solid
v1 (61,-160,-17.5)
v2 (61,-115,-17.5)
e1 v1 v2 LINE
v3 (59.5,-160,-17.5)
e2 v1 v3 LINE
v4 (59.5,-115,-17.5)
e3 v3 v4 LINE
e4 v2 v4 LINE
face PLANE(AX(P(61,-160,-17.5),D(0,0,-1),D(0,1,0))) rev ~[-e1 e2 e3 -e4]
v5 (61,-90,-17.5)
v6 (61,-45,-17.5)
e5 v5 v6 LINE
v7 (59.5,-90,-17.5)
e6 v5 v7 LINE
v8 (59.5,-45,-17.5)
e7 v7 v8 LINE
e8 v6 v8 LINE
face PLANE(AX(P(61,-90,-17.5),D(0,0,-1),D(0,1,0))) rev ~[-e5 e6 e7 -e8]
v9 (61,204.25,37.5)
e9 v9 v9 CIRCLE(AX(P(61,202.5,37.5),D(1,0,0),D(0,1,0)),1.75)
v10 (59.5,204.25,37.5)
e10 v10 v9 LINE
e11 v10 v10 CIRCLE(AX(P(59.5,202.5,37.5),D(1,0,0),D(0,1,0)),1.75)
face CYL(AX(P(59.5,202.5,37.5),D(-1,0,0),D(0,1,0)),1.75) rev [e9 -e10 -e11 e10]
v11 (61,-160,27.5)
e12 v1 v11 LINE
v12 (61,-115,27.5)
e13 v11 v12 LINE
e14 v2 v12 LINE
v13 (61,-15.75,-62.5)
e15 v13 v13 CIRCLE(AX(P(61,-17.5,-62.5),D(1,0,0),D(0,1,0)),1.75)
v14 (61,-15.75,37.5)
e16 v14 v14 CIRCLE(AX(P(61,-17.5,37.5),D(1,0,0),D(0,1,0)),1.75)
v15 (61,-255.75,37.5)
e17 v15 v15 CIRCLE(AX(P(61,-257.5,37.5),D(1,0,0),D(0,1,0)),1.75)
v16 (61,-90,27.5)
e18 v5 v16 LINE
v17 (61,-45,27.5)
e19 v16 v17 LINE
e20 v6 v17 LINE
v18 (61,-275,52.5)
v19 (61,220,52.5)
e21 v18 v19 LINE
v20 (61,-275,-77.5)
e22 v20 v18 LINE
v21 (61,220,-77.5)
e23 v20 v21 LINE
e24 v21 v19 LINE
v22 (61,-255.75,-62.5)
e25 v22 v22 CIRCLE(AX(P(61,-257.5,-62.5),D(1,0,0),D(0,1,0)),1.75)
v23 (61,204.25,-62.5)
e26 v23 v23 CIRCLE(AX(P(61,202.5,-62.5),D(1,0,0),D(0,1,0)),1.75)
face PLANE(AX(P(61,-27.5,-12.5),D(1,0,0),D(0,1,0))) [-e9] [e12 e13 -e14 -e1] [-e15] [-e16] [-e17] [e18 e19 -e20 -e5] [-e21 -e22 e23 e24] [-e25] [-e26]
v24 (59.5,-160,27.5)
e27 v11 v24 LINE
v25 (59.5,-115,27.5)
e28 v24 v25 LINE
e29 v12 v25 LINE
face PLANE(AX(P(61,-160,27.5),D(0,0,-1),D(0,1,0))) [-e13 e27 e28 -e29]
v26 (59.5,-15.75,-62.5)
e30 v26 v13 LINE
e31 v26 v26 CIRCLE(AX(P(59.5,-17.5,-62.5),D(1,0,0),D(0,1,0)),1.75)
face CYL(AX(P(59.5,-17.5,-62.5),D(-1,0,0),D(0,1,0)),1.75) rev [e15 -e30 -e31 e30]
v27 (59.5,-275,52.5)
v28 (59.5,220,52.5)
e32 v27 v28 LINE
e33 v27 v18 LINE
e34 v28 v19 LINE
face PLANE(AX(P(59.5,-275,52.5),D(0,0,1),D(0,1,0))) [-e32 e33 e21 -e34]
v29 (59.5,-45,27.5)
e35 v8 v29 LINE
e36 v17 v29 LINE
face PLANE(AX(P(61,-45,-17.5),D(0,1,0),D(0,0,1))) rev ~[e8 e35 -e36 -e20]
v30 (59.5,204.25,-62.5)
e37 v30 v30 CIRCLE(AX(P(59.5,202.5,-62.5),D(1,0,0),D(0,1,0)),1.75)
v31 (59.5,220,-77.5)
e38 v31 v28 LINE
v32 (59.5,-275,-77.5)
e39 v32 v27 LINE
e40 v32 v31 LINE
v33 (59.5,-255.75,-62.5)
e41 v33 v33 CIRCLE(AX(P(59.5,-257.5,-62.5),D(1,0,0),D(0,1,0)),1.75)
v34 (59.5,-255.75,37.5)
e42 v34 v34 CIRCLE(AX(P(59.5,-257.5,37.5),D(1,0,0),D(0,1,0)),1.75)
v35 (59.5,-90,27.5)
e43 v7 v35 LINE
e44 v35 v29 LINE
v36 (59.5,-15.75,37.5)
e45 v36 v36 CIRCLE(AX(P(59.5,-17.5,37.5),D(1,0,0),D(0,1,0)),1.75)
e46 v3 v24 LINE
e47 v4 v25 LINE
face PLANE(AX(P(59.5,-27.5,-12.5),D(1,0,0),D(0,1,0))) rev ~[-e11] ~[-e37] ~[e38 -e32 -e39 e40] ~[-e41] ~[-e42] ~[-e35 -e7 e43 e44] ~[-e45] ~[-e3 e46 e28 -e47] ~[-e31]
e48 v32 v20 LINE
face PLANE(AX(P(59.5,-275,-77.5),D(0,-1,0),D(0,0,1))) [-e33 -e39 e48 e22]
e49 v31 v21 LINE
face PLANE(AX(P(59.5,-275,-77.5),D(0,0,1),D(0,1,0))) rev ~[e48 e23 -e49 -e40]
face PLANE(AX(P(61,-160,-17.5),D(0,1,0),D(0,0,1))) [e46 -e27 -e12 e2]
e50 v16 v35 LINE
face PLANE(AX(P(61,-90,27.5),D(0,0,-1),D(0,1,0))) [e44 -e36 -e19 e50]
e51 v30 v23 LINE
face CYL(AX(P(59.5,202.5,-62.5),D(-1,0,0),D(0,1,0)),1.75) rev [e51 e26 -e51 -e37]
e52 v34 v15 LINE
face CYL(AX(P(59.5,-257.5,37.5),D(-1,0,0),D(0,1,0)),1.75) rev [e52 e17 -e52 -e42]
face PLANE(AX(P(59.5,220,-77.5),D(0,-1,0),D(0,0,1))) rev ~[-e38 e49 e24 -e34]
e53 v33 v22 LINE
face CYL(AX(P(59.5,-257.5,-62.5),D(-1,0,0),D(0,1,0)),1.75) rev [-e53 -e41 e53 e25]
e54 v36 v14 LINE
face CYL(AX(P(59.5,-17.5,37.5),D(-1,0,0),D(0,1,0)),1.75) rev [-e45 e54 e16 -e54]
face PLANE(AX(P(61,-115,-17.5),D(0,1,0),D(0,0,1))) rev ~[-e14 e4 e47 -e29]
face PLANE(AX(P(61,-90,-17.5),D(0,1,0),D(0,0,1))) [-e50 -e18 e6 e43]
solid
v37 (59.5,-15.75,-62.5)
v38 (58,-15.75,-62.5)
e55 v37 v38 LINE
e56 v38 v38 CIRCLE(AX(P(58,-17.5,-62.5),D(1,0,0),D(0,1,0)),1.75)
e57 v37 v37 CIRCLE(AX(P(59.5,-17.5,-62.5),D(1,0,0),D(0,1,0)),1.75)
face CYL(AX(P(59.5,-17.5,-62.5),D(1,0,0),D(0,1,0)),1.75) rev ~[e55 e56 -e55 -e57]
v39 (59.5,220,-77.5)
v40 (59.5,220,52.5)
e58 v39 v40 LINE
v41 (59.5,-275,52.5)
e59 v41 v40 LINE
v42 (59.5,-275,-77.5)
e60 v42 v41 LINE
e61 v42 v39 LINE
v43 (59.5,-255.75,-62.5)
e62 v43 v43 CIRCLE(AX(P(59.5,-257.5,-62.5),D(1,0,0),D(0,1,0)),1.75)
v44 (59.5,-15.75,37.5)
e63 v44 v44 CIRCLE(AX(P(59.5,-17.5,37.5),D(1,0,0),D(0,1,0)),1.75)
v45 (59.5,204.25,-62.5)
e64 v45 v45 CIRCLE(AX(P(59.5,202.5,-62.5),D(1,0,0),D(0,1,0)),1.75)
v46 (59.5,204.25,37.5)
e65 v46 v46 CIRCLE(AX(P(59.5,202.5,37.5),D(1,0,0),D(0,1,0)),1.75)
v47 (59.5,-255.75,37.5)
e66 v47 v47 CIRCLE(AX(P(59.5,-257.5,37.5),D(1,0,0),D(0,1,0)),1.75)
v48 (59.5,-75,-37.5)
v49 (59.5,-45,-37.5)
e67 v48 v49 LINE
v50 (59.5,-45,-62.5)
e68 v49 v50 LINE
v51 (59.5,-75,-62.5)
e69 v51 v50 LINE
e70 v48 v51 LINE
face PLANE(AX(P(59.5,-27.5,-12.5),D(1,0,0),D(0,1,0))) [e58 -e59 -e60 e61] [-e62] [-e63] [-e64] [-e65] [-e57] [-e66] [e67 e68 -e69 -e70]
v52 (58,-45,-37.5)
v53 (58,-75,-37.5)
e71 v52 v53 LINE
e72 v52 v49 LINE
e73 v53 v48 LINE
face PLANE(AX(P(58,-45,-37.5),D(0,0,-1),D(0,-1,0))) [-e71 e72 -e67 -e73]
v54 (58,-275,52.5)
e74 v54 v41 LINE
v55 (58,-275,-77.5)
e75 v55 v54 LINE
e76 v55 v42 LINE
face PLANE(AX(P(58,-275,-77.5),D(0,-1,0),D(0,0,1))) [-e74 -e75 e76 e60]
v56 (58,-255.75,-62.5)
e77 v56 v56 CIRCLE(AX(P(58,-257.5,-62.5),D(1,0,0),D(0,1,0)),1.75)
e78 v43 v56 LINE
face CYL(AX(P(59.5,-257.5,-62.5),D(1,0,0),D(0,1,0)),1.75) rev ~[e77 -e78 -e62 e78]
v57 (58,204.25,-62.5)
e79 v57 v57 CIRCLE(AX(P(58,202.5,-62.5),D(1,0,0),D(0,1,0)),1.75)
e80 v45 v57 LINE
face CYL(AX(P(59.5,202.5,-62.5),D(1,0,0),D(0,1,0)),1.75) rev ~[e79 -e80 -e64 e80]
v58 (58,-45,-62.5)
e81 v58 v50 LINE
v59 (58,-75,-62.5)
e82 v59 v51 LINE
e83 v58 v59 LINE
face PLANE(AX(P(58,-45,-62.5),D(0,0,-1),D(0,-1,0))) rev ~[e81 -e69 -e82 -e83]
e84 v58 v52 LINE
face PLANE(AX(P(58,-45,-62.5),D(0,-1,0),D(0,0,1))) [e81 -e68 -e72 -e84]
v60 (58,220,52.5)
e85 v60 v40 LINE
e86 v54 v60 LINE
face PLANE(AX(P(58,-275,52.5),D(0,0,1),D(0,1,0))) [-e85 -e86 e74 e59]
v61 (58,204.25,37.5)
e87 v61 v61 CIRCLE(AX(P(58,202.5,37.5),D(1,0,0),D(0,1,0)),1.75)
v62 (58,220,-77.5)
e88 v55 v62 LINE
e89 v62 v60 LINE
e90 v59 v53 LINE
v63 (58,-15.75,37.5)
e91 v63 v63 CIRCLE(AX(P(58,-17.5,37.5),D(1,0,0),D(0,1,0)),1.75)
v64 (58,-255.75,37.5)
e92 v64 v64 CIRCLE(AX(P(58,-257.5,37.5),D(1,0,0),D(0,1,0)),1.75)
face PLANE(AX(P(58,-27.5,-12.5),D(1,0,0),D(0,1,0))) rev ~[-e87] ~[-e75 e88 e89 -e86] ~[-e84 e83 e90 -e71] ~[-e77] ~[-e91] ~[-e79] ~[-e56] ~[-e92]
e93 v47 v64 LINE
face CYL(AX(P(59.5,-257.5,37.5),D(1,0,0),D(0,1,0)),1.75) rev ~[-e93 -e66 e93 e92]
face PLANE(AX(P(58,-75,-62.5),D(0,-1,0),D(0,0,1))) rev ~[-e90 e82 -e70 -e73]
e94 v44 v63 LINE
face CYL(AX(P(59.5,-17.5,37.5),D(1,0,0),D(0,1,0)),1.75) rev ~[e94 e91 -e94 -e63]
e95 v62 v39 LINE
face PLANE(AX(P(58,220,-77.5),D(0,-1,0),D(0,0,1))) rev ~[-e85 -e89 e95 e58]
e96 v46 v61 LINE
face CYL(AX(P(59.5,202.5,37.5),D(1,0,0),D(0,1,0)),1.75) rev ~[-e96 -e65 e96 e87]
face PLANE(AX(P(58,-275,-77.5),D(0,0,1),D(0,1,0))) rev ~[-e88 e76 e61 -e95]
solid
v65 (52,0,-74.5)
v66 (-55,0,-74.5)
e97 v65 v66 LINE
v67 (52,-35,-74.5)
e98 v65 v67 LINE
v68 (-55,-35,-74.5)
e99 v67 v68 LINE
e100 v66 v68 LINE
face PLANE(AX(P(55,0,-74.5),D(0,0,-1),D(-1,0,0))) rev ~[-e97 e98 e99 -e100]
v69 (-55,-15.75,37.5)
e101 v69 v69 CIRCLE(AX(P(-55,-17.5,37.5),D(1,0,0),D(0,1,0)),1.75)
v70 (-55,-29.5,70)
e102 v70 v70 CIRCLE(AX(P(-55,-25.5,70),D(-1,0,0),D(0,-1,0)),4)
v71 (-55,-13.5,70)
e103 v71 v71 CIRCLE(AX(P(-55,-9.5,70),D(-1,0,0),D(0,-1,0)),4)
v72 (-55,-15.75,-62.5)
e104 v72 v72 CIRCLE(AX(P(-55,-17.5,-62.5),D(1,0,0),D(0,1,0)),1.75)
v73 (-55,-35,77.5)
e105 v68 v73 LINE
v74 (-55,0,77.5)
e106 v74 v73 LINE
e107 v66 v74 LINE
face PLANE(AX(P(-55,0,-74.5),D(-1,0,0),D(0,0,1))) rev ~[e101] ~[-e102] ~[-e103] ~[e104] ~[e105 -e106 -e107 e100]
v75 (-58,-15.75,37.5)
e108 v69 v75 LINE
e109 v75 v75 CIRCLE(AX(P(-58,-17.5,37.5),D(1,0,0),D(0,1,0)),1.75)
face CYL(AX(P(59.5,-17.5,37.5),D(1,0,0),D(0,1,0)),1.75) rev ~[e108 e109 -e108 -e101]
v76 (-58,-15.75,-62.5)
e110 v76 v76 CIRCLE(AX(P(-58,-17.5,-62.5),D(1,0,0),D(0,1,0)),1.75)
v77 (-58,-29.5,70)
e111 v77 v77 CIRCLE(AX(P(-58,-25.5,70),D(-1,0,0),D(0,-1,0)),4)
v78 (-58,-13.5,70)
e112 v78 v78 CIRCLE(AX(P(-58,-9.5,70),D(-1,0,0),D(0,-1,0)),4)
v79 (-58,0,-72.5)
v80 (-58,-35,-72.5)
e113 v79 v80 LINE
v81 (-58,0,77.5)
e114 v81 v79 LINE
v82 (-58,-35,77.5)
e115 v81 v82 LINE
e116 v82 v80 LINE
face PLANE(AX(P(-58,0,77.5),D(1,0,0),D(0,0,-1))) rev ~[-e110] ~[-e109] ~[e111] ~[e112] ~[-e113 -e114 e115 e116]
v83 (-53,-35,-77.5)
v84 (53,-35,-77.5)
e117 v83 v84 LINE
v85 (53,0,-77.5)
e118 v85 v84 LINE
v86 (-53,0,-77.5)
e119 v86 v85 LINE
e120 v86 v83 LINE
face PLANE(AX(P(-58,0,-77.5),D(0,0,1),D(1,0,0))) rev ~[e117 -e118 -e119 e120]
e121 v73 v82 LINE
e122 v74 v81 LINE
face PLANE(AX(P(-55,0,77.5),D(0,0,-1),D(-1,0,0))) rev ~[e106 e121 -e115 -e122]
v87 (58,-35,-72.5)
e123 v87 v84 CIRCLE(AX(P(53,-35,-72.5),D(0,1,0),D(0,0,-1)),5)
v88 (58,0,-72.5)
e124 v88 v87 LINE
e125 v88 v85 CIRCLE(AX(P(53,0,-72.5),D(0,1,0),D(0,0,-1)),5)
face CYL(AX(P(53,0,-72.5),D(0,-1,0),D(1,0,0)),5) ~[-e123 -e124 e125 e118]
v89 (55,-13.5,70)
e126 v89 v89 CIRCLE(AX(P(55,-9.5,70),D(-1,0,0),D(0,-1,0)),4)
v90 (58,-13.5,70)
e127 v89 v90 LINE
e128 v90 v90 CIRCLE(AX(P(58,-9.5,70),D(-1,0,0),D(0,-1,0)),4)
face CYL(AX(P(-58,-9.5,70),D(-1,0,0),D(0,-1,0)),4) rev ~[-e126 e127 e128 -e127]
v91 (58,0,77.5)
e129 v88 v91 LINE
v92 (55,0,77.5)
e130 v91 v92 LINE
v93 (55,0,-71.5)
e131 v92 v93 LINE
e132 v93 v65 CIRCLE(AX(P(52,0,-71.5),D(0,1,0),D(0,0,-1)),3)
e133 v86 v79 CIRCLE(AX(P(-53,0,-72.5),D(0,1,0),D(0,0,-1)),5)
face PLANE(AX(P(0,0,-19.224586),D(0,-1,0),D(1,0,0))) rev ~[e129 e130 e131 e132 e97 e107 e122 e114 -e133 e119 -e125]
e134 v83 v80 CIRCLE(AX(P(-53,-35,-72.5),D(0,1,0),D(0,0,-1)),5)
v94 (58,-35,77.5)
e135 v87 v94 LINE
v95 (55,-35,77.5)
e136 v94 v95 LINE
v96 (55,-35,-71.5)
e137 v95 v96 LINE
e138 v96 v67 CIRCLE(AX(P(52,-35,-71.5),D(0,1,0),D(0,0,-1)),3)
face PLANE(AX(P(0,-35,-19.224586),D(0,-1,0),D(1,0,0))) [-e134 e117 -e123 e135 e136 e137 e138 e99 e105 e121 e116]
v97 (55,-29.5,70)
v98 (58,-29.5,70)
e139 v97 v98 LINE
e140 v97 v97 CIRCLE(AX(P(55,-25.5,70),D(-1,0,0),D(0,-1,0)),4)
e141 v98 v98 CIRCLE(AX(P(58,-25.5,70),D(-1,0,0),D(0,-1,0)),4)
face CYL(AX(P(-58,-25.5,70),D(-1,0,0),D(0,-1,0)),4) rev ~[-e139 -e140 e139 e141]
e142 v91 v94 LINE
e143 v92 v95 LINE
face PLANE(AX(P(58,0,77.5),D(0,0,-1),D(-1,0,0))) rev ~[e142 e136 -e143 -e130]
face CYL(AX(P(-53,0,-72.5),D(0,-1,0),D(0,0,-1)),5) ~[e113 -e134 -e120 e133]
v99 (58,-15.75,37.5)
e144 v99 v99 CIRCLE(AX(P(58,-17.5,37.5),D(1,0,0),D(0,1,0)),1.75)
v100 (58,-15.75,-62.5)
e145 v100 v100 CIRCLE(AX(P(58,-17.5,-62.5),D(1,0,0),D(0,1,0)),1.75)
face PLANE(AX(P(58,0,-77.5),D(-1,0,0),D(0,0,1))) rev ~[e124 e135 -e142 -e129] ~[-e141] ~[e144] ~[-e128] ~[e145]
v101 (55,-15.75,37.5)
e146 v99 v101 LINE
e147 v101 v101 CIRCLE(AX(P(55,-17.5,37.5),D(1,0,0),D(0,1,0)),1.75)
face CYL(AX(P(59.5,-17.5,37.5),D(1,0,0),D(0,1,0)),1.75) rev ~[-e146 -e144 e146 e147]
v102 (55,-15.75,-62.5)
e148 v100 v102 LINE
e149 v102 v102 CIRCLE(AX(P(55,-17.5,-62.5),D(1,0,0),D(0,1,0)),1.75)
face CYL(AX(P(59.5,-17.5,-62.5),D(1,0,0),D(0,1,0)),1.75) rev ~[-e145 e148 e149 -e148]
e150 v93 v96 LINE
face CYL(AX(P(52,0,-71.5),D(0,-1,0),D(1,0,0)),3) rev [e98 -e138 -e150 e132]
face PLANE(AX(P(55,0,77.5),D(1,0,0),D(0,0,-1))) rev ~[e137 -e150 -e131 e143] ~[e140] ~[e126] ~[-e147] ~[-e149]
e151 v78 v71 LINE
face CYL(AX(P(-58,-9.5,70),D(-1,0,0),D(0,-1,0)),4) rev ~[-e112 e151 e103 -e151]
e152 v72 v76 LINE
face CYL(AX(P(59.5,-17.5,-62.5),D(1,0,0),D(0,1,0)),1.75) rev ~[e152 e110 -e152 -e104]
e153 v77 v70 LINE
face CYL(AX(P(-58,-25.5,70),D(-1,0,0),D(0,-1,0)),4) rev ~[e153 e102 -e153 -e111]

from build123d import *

# Parameters (mm, degrees)
F1_DEPTH  = 35
F2_R      = 3
F3_R      = 5
F4_R      = 4
F5_DEPTH  = 116.001
F6_W      = 495
F6_H      = 130
F7_DEPTH  = 1.5
F8_R      = 1.75
F9_DEPTH  = 117.501
F10_DEPTH = 1.5
F11_W     = 45
F11_H     = 45
F12_DEPTH = 25
F13_W     = 30
F13_H     = 25
F14_DEPTH = 25


with BuildPart() as f1:
    # F0 (on Front) → F1 (new body)
    with BuildSketch(Plane.XZ):
        Polygon((-58, -77.5), (58, -77.5), (58, 77.5), (55, 77.5), (55, -74.5), (-55, -74.5), (-55, 77.5), (-58, 77.5), align=None)
    extrude(amount=F1_DEPTH)

    # F2
    f2_edges = [f1.edges().sort_by_distance(p)[0] for p in [
        (55, -17.5, -74.5),
    ]]
    fillet(f2_edges, radius=F2_R)

    # F3
    f3_edges = [f1.edges().sort_by_distance(p)[0] for p in [
        (-58, -17.5, -77.5),
        (58, -17.5, -77.5),
    ]]
    fillet(f3_edges, radius=F3_R)

    # F4 (on face) → F5 (cut, through all)
    with BuildSketch(Plane(origin=(-58, 0, 0), x_dir=(0, -1, 0), z_dir=(-1, 0, 0))):
        with Locations((9.5, 70)):
            Circle(F4_R)
        with Locations((25.5, 70)):
            Circle(F4_R)
    extrude(amount=-F5_DEPTH, mode=Mode.SUBTRACT)


with BuildPart() as f7:
    # F6 (on face) → F7 (new body)
    with BuildSketch(Plane.YZ.offset(58)):
        with Locations((-27.5, -12.5)):
            Rectangle(F6_W, F6_H)
    extrude(amount=F7_DEPTH)


with BuildPart() as f9_tool:
    # F8 (on face) → F9 (new body, through all)
    with BuildSketch(Plane.YZ.offset(59.5)):
        with Locations((-17.5, 37.5)):
            Circle(F8_R)
        with Locations((-17.5, -62.5)):
            Circle(F8_R)
        with Locations((202.5, -62.5)):
            Circle(F8_R)
        with Locations((202.5, 37.5)):
            Circle(F8_R)
        with Locations((-257.5, 37.5)):
            Circle(F8_R)
        with Locations((-257.5, -62.5)):
            Circle(F8_R)
    extrude(amount=-F9_DEPTH)


with BuildPart() as f1_1:
    add(f1.part)

    # F9: cut by f9_tool
    add(f9_tool.part, mode=Mode.SUBTRACT)


with BuildPart() as f7_1:
    add(f7.part)

    # F9: cut by f9_tool
    add(f9_tool.part, mode=Mode.SUBTRACT)


with BuildPart() as f10:
    # F10 (new): a face of the model
    f10_faces = [f7_1.part.faces().sort_by_distance(p)[0] for p in [
        (59.5, -27.5029929343, -12.5),
    ]]
    extrude(f10_faces, amount=F10_DEPTH)

    # F11 (on face) → F12 (cut)
    with BuildSketch(Plane.YZ.offset(61)):
        with Locations((-67.5, 5)):
            Rectangle(F11_W, F11_H)
        with Locations((-137.5, 5)):
            Rectangle(F11_W, F11_H)
    extrude(amount=-F12_DEPTH, mode=Mode.SUBTRACT)


with BuildPart() as f7_2:
    add(f7_1.part)

    # F13 (on face) → F14 (cut)
    with BuildSketch(Plane(origin=(58, 0, 0), x_dir=(0, -1, 0), z_dir=(-1, 0, 0))):
        with Locations((60, -50)):
            Rectangle(F13_W, F13_H)
    extrude(amount=-F14_DEPTH, mode=Mode.SUBTRACT)


solid = Compound([f1_1.part, f10.part, f7_2.part])
